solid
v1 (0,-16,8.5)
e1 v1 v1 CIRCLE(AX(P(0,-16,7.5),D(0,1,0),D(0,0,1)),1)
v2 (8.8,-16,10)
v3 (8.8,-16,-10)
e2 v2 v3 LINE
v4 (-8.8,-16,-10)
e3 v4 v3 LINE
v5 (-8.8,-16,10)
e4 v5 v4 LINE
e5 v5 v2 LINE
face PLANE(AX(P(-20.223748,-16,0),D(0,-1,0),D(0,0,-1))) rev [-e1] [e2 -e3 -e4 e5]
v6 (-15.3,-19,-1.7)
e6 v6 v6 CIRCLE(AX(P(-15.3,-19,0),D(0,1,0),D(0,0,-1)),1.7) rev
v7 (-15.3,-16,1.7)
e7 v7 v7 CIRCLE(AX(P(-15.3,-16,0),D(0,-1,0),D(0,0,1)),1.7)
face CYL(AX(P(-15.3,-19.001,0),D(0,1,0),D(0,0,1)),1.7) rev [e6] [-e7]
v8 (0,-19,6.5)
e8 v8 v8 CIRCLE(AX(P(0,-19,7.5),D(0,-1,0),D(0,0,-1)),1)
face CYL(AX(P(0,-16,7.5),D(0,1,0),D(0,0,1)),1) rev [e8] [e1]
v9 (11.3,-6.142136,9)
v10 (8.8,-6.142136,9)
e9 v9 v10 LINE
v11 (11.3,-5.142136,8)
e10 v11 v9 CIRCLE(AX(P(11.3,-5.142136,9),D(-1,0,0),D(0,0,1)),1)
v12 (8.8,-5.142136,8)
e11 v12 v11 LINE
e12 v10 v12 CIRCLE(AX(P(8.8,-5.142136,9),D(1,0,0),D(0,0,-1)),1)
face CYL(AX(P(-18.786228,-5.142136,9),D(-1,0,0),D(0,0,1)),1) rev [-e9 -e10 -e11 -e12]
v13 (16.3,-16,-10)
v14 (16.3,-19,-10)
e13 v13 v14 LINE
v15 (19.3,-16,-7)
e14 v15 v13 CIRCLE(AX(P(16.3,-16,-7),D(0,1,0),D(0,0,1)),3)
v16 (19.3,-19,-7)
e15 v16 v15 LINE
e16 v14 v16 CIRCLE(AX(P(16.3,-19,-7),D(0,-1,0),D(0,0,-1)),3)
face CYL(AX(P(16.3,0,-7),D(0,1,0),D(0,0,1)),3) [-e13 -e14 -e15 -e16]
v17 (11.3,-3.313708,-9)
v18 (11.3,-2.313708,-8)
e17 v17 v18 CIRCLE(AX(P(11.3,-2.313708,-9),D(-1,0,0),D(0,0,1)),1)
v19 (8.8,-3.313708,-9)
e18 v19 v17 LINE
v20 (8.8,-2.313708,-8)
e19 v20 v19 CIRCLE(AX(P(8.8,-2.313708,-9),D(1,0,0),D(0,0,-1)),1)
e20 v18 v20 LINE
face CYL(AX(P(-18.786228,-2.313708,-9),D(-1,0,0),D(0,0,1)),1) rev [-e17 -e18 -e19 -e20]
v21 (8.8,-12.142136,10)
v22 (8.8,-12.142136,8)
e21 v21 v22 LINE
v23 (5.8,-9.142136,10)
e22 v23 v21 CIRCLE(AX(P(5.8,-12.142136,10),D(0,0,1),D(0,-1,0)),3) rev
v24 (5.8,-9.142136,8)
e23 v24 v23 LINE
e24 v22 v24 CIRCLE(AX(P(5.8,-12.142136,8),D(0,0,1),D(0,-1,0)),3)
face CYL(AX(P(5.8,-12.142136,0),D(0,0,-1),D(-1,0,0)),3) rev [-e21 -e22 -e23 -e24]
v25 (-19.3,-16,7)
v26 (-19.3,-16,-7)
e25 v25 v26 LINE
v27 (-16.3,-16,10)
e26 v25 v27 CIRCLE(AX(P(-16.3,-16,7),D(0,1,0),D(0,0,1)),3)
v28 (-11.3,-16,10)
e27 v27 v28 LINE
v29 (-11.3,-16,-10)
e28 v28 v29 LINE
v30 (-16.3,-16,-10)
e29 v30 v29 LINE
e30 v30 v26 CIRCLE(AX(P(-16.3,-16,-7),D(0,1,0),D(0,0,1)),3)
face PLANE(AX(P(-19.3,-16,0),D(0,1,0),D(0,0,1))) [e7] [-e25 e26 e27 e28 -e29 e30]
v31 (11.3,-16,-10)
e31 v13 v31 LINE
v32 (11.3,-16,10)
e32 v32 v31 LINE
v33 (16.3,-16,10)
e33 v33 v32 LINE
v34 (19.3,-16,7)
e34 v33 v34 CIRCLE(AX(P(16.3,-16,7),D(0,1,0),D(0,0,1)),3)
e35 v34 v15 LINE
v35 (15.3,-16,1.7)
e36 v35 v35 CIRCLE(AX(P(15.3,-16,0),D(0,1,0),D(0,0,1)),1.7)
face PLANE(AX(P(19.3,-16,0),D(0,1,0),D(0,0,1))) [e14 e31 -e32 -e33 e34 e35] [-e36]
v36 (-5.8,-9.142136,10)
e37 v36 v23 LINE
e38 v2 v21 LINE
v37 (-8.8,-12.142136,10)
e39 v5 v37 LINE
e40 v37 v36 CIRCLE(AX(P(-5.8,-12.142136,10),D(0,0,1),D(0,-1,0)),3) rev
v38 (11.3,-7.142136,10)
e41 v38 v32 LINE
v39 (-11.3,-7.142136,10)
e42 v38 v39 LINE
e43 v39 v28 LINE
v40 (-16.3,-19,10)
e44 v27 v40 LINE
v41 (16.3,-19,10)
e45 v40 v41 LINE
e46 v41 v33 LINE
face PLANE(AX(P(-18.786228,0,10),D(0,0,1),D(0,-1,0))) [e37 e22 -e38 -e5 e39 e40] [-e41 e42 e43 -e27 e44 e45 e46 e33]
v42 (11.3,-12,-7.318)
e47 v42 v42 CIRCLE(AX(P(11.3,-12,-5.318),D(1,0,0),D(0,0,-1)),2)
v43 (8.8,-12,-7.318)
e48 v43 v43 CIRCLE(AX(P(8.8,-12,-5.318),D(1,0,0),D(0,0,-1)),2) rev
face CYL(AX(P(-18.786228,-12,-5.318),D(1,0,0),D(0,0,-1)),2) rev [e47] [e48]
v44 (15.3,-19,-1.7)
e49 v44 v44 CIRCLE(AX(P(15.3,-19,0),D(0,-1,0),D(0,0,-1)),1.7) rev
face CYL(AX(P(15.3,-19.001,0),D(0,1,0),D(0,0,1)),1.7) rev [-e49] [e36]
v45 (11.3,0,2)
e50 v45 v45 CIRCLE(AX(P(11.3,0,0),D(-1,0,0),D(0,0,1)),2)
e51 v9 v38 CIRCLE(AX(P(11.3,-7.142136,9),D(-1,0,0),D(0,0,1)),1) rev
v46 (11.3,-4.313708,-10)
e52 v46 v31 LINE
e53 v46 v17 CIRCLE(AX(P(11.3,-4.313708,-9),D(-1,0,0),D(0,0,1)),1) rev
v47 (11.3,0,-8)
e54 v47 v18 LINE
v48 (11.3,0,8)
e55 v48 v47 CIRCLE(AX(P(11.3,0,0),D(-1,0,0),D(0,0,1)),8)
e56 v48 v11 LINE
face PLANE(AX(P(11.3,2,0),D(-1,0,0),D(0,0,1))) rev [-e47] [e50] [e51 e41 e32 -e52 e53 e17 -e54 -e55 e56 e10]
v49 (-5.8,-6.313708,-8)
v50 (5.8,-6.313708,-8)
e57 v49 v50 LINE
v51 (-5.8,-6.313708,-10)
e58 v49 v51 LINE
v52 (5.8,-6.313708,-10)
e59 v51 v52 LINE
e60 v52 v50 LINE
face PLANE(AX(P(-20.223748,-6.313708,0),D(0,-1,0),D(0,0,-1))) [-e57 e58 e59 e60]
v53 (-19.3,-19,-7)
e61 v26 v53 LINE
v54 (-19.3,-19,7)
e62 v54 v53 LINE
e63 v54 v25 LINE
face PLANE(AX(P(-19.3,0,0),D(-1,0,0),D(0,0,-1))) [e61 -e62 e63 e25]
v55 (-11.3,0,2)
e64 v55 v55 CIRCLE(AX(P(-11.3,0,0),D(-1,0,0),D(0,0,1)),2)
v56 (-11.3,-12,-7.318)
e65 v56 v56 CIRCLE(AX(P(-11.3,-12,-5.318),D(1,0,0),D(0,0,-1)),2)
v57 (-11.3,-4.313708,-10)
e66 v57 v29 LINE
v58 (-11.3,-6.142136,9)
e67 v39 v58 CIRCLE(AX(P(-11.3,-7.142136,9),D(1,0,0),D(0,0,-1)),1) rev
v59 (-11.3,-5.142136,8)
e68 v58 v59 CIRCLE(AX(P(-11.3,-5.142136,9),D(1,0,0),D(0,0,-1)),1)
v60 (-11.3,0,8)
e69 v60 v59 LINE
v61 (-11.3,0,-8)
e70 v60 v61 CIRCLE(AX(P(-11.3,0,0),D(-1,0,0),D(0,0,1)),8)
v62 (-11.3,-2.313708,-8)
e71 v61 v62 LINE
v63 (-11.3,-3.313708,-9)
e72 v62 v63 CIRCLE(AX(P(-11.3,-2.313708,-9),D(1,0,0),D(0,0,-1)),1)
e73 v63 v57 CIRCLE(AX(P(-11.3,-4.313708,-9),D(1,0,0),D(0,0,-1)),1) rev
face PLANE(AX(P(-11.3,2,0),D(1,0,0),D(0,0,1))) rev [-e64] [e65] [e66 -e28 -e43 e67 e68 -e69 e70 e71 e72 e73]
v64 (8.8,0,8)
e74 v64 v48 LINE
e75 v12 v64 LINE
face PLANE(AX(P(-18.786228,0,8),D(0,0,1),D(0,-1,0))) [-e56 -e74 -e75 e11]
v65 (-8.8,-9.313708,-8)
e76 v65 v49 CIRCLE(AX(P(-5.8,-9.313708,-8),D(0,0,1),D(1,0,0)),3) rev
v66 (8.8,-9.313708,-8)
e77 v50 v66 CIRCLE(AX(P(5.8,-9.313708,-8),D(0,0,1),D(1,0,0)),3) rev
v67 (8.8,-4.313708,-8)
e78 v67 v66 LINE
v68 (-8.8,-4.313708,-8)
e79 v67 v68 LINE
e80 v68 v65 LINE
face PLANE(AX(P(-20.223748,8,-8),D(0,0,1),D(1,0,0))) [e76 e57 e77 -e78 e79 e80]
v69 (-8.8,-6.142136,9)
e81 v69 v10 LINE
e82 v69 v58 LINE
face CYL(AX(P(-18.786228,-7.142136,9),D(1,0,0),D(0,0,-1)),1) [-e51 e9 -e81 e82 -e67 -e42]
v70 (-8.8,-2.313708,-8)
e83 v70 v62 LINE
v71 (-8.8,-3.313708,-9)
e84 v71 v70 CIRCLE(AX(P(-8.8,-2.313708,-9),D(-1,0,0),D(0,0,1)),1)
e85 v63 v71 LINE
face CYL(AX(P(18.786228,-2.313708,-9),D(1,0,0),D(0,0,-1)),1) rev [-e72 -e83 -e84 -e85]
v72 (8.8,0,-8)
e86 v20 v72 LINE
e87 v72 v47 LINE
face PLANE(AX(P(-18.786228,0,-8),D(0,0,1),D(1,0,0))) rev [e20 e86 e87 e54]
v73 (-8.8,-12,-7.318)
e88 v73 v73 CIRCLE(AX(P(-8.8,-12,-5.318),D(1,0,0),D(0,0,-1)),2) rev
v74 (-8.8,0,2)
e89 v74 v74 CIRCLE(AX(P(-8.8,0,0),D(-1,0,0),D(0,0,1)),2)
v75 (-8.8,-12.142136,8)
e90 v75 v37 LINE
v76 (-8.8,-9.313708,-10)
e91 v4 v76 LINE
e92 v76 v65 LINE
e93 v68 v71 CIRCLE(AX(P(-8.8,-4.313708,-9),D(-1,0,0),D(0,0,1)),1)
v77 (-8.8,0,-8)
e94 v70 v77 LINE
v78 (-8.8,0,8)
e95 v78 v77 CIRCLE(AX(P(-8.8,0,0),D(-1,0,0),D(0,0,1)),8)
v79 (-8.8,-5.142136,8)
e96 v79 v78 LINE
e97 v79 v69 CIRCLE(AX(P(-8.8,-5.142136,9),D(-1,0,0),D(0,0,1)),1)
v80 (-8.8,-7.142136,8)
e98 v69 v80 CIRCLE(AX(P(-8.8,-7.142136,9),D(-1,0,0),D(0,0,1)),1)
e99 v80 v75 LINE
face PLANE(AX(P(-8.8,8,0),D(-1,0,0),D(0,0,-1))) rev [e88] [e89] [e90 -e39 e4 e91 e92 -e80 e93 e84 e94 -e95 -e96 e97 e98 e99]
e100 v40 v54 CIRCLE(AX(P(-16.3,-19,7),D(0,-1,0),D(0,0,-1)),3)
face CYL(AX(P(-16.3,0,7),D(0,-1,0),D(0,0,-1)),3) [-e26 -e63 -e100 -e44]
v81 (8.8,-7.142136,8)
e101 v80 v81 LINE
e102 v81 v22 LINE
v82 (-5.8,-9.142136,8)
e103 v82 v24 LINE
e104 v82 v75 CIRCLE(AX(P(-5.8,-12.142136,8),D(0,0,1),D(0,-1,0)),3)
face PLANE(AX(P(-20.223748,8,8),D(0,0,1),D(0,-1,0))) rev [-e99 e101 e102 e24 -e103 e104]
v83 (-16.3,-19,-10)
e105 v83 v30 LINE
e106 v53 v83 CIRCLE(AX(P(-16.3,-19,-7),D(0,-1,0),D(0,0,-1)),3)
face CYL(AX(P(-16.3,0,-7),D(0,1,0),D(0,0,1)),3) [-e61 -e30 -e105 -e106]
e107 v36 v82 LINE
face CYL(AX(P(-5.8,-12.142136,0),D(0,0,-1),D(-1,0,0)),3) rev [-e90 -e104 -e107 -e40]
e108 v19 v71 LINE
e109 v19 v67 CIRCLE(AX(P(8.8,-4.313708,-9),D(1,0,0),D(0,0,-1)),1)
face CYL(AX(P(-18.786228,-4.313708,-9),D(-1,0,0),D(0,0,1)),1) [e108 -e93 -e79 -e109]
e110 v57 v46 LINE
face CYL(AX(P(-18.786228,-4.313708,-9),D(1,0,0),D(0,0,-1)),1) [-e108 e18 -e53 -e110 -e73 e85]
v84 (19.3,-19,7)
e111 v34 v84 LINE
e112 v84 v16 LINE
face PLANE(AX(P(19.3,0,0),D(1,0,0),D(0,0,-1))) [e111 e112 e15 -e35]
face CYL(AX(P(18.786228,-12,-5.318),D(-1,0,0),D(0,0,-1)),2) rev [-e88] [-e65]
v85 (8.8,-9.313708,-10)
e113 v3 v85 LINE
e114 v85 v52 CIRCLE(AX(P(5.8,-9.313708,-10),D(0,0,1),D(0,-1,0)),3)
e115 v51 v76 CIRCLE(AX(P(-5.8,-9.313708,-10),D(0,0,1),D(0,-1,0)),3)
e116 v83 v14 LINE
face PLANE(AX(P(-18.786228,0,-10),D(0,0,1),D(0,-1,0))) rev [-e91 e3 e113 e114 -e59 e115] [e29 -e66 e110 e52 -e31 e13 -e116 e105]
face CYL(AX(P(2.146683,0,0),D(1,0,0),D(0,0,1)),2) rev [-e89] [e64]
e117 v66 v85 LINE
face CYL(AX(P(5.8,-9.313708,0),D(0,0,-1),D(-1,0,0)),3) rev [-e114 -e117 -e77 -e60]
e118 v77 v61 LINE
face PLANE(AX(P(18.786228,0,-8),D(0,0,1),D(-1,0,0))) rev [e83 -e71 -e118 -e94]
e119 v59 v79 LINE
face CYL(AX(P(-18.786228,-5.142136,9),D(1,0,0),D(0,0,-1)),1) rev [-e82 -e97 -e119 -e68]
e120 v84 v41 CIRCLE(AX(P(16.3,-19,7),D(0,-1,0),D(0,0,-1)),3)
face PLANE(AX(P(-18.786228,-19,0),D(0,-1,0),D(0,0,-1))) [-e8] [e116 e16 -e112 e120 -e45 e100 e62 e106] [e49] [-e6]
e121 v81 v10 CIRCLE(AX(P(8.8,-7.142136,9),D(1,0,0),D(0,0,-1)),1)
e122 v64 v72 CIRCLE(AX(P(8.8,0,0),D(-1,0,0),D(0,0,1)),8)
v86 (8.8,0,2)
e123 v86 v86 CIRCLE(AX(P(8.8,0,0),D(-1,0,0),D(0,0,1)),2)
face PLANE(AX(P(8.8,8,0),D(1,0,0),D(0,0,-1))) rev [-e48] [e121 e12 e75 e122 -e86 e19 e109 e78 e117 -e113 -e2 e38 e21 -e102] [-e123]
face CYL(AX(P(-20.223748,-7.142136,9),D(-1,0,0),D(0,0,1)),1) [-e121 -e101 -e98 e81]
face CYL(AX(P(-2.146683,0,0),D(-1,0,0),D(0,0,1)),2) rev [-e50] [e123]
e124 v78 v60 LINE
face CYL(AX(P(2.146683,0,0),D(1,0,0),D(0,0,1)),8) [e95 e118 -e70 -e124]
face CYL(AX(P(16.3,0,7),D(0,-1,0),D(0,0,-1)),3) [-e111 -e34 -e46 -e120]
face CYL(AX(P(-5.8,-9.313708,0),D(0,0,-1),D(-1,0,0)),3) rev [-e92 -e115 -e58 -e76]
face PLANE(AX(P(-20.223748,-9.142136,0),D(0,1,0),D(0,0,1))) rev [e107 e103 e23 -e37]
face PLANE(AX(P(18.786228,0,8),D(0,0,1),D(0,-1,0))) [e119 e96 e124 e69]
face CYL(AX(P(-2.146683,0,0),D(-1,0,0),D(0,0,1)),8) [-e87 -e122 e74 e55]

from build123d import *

# Parameters (mm, degrees)
ESQUISSE2_W                    = 2.5
ESQUISSE2_H                    = 6
BOSS_EXTRU_1_START             = -2.5
ESQUISSE3_R                    = 2
BOSS_EXTRU_1_DEPTH             = 2.5
BOSS_EXTRU_2_START             = -2.5
ESQUISSE3_3_W                  = 20
ESQUISSE3_3_H                  = 3
ESQUISSE3_3_W_2                = 2
BOSS_EXTRU_2_DEPTH             = 8.8
ESQUISSE3_5_W                  = 20
ESQUISSE3_5_H                  = 3
BOSS_EXTRUDE1_DEPTH            = 8
CUT_EXTRUDE1_REACH             = 34.38
SKETCH4_R                      = 1.7
TROUS_DE_CENTRAGE_2_0MM1_D     = 2
TROUS_DE_CENTRAGE_2_0MM1_DEPTH = 3
FILLET1_R                      = 1
FILLET2_START                  = -8.8
FILLET2_DEPTH                  = 17.6
FILLET2_START_2                = -19.3
FILLET2_2_DEPTH                = 38.6
FILLET3_R                      = 3


with BuildPart() as part:
    # Esquisse2 → Révolution1 (revolve)
    with BuildSketch(Plane.XY, mode=Mode.PRIVATE) as r_volution1_sk:
        with Locations((10.05, 5)):
            Rectangle(ESQUISSE2_W, ESQUISSE2_H)
    revolve(r_volution1_sk.sketch.rotate(Axis((-2.14668318, 0, 0), (1, 0, 0)), 90), axis=Axis((-2.14668318, 0, 0), (1, 0, 0)))

    # Esquisse3 → Boss.-Extru.1 (add)
    with BuildSketch(Plane(origin=(11.3, 0, 0), x_dir=(0, 0, -1), z_dir=(1, 0, 0)).offset(BOSS_EXTRU_1_START)):
        with BuildLine():
            Line((-10, -19), (10, -19))
            Line((10, -19), (10, -3.313708499))
            Line((10, -3.313708499), (8, -3.313708499))
            Line((8, -3.313708499), (8, 0))
            ThreePointArc((8, 0), (0, -8), (-8, 0))
            Line((-8, 0), (-8, -6.142135624))
            Line((-8, -6.142135624), (-10, -6.142135624))
            Line((-10, -6.142135624), (-10, -19))
        make_face()
        with Locations((5.318, -12)):
            Circle(ESQUISSE3_R, mode=Mode.SUBTRACT)
    extrude(amount=BOSS_EXTRU_1_DEPTH)

    # Esquisse3<3> → Boss.-Extru.2 (add)
    with BuildSketch(Plane(origin=(11.3, 0, 0), x_dir=(0, 0, -1), z_dir=(1, 0, 0)).offset(BOSS_EXTRU_2_START)):
        with Locations((0, -17.5)):
            Rectangle(ESQUISSE3_3_W, ESQUISSE3_3_H)
        with Locations((-9, -7.642135624)):
            Rectangle(ESQUISSE3_3_W_2, ESQUISSE3_3_H)
        with Locations((9, -4.813708499)):
            Rectangle(ESQUISSE3_3_W_2, ESQUISSE3_3_H)
    extrude(amount=-BOSS_EXTRU_2_DEPTH)

    # Esquisse3<5> → Boss-Extrude1 (add)
    with BuildSketch(Plane(origin=(11.3, 0, 0), x_dir=(0, 0, -1), z_dir=(1, 0, 0))):
        with Locations((0, -17.5)):
            Rectangle(ESQUISSE3_5_W, ESQUISSE3_5_H)
    extrude(amount=BOSS_EXTRUDE1_DEPTH)

    # Sketch4 → Cut-Extrude1 (cut, up to next)
    with BuildSketch(Plane(origin=(0, -16, 0), x_dir=(1, 0, 0), z_dir=(0, 1, 0)), mode=Mode.PRIVATE) as cut_extrude1_sk1:
        with Locations(Location((15.3, 0, 0), (0, 0, 270))):
            Circle(SKETCH4_R)
    cut_extrude1_tool1 = extrude(cut_extrude1_sk1.sketch, amount=-CUT_EXTRUDE1_REACH, mode=Mode.PRIVATE) & part.part
    add(cut_extrude1_tool1.solids().sort_by_distance((15.3, -16, 0))[0], mode=Mode.SUBTRACT)

    # Symétrie1: part across plane


with BuildPart() as part_1:
    add(part.part)
    add(part.part.mirror(Plane(origin=(0, 0, 0), x_dir=(0, 0, 1), z_dir=(1, 0, 0))))

    # Trous de centrage Ø2.0mm1
    with Locations(Plane(origin=(0, -16, 0), x_dir=(1, 0, 0), z_dir=(0, 1, 0))):
        with Locations((0, -7.5)):
            Hole(TROUS_DE_CENTRAGE_2_0MM1_D / 2, depth=TROUS_DE_CENTRAGE_2_0MM1_DEPTH)

    # Fillet1
    fillet1_edges = [part_1.edges().sort_by_distance(p)[0] for p in [
        (-10.05, -3.313708499, -8),
        (-10.05, -6.142135624, 8),
        (10.05, -3.313708499, -8),
        (10.05, -6.142135624, 8),
    ]]
    fillet(fillet1_edges, radius=FILLET1_R)

    # Fillet2: read off the stored shape, not the designer's step
    # Fillet2 outline → Fillet2 (cut)
    with BuildSketch(Plane.YZ.offset(FILLET2_START)):
        with BuildLine():
            ThreePointArc((-4.313708499, -8), (-3.606601718, -8.292893219), (-3.313708499, -9))
            Line((-3.313708499, -9), (-3.313708499, -8))
            Line((-3.313708499, -8), (-4.313708499, -8))
        make_face()
        with BuildLine():
            ThreePointArc((-3.313708499, -9), (-3.606601718, -9.707106781), (-4.313708499, -10))
            Line((-4.313708499, -10), (-3.313708499, -10))
            Line((-3.313708499, -10), (-3.313708499, -9))
        make_face()
        with BuildLine():
            Line((-6.142135624, 8), (-6.142135624, 9))
            ThreePointArc((-6.142135624, 9), (-6.435028843, 8.292893219), (-7.142135624, 8))
            Line((-7.142135624, 8), (-6.142135624, 8))
        make_face()
        with BuildLine():
            ThreePointArc((-7.142135624, 10), (-6.435028843, 9.707106781), (-6.142135624, 9))
            Line((-6.142135624, 9), (-6.142135624, 10))
            Line((-6.142135624, 10), (-7.142135624, 10))
        make_face()
    extrude(amount=FILLET2_DEPTH, mode=Mode.SUBTRACT)

    # Fillet2 2 outline → Fillet2 2 (cut)
    with BuildSketch(Plane.YZ.offset(FILLET2_START_2)):
        with BuildLine():
            ThreePointArc((-3.313708499, -9), (-3.606601718, -9.707106781), (-4.313708499, -10))
            Line((-4.313708499, -10), (-3.313708499, -10))
            Line((-3.313708499, -10), (-3.313708499, -9))
        make_face()
        with BuildLine():
            ThreePointArc((-7.142135624, 10), (-6.435028843, 9.707106781), (-6.142135624, 9))
            Line((-6.142135624, 9), (-6.142135624, 10))
            Line((-6.142135624, 10), (-7.142135624, 10))
        make_face()
    extrude(amount=FILLET2_2_DEPTH, mode=Mode.SUBTRACT)

    # Fillet3
    fillet3_edges = [part_1.edges().sort_by_distance(p)[0] for p in [
        (-8.8, -6.313708499, -9),
        (-19.3, -17.5, -10),
        (8.8, -6.313708499, -9),
        (8.8, -9.142135624, 9),
        (19.3, -17.5, -10),
        (19.3, -17.5, 10),
        (-8.8, -9.142135624, 9),
        (-19.3, -17.5, 10),
    ]]
    fillet(fillet3_edges, radius=FILLET3_R)


solid = part_1.part
